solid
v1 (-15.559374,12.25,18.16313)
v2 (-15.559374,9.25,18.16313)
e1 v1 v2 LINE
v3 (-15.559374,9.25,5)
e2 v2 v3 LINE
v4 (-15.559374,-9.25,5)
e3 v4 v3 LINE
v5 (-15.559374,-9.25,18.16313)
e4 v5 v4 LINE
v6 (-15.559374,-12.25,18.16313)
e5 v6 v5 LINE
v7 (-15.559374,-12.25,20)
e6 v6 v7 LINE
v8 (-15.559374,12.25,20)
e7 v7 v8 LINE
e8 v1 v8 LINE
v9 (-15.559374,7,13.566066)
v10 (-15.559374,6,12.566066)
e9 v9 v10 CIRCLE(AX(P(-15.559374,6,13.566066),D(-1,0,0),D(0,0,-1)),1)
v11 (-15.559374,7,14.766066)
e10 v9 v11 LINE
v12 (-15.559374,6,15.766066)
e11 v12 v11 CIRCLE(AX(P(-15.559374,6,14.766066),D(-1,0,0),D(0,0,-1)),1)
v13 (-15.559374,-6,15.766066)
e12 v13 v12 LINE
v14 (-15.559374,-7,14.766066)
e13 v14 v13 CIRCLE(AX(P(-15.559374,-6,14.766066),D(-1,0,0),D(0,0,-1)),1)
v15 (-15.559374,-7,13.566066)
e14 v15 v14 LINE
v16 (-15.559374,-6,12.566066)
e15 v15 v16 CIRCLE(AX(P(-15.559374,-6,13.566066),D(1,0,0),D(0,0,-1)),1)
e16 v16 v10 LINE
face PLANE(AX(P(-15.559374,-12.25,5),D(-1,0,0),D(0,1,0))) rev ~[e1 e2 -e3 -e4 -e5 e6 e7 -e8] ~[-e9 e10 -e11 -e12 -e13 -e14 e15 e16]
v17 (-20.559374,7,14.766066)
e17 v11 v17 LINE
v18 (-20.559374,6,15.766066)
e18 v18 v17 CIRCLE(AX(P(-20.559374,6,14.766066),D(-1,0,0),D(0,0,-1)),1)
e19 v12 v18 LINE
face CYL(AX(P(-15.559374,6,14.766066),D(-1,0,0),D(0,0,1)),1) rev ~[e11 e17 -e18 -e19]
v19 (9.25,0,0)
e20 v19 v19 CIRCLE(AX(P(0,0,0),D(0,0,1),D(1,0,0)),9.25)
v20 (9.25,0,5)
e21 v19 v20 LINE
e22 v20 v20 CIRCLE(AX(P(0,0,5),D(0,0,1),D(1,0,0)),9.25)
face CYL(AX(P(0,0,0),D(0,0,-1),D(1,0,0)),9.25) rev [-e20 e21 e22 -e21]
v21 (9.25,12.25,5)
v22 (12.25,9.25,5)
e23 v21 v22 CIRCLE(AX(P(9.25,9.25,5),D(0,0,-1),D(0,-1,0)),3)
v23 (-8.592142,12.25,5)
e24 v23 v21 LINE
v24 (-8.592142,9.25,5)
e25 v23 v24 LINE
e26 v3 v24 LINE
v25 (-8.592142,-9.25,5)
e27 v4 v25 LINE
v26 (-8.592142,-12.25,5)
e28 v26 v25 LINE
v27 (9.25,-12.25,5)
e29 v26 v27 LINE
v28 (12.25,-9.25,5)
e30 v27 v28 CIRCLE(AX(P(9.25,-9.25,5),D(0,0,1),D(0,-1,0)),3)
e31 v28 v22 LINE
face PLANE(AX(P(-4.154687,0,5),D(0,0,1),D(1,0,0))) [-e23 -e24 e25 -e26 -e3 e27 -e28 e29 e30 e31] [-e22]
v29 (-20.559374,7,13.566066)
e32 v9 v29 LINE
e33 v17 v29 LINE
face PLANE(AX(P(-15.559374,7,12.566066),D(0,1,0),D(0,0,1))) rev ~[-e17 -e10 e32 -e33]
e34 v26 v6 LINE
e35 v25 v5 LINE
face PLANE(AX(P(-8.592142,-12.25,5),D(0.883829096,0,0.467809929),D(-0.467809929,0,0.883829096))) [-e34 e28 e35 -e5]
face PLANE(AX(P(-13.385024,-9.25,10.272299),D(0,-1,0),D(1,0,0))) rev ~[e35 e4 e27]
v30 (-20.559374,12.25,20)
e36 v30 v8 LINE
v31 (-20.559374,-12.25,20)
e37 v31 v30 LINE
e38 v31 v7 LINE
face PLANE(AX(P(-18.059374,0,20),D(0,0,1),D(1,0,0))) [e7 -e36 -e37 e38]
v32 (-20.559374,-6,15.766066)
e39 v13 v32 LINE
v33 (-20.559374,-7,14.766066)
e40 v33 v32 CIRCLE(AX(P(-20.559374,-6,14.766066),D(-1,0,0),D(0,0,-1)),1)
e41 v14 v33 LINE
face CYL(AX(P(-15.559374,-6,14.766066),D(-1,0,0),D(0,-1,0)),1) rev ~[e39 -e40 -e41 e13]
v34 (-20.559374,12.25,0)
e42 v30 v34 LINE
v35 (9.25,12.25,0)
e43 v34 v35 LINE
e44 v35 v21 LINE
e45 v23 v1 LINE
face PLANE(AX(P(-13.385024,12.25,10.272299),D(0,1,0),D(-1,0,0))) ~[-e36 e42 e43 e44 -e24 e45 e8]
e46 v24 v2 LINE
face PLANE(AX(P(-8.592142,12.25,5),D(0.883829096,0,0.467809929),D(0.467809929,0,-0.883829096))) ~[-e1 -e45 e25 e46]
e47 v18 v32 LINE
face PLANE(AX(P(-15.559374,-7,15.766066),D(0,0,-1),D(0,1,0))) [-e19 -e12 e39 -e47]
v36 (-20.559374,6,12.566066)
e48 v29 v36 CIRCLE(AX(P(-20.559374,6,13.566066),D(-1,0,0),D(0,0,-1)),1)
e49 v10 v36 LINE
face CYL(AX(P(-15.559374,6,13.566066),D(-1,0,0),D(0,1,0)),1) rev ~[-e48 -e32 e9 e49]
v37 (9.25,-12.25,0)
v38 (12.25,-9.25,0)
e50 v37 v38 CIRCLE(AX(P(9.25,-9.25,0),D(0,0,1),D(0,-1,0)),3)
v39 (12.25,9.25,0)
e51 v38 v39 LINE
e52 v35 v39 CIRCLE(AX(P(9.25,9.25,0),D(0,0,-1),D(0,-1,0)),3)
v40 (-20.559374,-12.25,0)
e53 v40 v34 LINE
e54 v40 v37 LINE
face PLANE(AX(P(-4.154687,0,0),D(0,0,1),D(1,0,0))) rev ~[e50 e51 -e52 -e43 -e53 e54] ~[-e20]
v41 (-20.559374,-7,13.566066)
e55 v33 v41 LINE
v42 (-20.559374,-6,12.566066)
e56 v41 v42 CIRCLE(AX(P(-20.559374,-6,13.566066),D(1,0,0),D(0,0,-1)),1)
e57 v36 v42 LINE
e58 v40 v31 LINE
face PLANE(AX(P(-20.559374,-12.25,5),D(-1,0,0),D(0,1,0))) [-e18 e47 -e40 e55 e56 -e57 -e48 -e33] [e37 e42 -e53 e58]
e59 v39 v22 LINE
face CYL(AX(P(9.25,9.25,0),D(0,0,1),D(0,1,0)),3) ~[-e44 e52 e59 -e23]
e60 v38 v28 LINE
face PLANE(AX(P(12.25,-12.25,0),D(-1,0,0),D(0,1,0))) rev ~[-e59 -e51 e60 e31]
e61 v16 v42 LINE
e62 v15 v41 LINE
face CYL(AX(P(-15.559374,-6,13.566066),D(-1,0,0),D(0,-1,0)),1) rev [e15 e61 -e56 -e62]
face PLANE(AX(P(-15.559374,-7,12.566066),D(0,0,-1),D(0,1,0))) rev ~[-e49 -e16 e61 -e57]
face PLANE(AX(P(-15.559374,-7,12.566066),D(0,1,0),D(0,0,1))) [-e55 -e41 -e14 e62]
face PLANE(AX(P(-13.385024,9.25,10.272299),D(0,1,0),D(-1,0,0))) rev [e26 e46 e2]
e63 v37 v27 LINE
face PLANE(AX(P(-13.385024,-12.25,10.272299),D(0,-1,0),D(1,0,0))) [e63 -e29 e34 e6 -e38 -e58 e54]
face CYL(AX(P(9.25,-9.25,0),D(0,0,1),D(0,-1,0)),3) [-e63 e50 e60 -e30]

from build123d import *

# Parameters (mm, degrees)
F0_W     = 32.809374243
F0_H     = 24.5
F0_R     = 9.25
F1_DEPTH = 5
F2_W     = 5
F2_H     = 24.5
F3_DEPTH = 15
F5_DEPTH = 3
F6_W     = 14
F6_H     = 3.2
F7_DEPTH = 25
F8_R     = 1
F9_R     = 3


# Not quite as in the source:
# - a pattern or mirror of a feature is missing from the dataset's text; its kind, count and spacing are read off the source's solid


with BuildPart() as f1:
    # F0 (on Top) → F1 (new body)
    with BuildSketch(Plane.XY):
        with Locations((-4.1546871215, 0)):
            Rectangle(F0_W, F0_H)
        Circle(F0_R, mode=Mode.SUBTRACT)
    extrude(amount=F1_DEPTH)

    # F2 (on face) → F3 (join)
    with BuildSketch(Plane.XY.offset(5)):
        with Locations((-18.059374243, 0)):
            Rectangle(F2_W, F2_H)
    extrude(amount=F3_DEPTH)

    # F4 (on face) → F5 (join)
    with BuildSketch(Plane.XZ.offset(12.25)):
        Polygon((-8.5921417922, 5), (-15.559374243, 18.1631296873), (-15.559374243, 5), align=None)
    f5 = extrude(amount=-F5_DEPTH)

    # F5_copies: F5 across plane
    add(f5.mirror(Plane.ZX))

    # F6 (on face) → F7 (cut)
    with BuildSketch(Plane.YZ.offset(-15.559374243)):
        with Locations((0, 14.1660655677)):
            Rectangle(F6_W, F6_H)
    extrude(amount=-F7_DEPTH, mode=Mode.SUBTRACT)

    # F8
    f8_edges = [f1.edges().sort_by_distance(p)[0] for p in [
        (-18.059374, 7, 12.566066),
        (-18.059374, 7, 15.766066),
        (-18.059374, -7, 12.566066),
        (-18.059374, -7, 15.766066),
    ]]
    fillet(f8_edges, radius=F8_R)

    # F9
    f9_edges = [f1.edges().sort_by_distance(p)[0] for p in [
        (12.25, -12.25, 2.5),
        (12.25, 12.25, 2.5),
    ]]
    fillet(f9_edges, radius=F9_R)


solid = f1.part
